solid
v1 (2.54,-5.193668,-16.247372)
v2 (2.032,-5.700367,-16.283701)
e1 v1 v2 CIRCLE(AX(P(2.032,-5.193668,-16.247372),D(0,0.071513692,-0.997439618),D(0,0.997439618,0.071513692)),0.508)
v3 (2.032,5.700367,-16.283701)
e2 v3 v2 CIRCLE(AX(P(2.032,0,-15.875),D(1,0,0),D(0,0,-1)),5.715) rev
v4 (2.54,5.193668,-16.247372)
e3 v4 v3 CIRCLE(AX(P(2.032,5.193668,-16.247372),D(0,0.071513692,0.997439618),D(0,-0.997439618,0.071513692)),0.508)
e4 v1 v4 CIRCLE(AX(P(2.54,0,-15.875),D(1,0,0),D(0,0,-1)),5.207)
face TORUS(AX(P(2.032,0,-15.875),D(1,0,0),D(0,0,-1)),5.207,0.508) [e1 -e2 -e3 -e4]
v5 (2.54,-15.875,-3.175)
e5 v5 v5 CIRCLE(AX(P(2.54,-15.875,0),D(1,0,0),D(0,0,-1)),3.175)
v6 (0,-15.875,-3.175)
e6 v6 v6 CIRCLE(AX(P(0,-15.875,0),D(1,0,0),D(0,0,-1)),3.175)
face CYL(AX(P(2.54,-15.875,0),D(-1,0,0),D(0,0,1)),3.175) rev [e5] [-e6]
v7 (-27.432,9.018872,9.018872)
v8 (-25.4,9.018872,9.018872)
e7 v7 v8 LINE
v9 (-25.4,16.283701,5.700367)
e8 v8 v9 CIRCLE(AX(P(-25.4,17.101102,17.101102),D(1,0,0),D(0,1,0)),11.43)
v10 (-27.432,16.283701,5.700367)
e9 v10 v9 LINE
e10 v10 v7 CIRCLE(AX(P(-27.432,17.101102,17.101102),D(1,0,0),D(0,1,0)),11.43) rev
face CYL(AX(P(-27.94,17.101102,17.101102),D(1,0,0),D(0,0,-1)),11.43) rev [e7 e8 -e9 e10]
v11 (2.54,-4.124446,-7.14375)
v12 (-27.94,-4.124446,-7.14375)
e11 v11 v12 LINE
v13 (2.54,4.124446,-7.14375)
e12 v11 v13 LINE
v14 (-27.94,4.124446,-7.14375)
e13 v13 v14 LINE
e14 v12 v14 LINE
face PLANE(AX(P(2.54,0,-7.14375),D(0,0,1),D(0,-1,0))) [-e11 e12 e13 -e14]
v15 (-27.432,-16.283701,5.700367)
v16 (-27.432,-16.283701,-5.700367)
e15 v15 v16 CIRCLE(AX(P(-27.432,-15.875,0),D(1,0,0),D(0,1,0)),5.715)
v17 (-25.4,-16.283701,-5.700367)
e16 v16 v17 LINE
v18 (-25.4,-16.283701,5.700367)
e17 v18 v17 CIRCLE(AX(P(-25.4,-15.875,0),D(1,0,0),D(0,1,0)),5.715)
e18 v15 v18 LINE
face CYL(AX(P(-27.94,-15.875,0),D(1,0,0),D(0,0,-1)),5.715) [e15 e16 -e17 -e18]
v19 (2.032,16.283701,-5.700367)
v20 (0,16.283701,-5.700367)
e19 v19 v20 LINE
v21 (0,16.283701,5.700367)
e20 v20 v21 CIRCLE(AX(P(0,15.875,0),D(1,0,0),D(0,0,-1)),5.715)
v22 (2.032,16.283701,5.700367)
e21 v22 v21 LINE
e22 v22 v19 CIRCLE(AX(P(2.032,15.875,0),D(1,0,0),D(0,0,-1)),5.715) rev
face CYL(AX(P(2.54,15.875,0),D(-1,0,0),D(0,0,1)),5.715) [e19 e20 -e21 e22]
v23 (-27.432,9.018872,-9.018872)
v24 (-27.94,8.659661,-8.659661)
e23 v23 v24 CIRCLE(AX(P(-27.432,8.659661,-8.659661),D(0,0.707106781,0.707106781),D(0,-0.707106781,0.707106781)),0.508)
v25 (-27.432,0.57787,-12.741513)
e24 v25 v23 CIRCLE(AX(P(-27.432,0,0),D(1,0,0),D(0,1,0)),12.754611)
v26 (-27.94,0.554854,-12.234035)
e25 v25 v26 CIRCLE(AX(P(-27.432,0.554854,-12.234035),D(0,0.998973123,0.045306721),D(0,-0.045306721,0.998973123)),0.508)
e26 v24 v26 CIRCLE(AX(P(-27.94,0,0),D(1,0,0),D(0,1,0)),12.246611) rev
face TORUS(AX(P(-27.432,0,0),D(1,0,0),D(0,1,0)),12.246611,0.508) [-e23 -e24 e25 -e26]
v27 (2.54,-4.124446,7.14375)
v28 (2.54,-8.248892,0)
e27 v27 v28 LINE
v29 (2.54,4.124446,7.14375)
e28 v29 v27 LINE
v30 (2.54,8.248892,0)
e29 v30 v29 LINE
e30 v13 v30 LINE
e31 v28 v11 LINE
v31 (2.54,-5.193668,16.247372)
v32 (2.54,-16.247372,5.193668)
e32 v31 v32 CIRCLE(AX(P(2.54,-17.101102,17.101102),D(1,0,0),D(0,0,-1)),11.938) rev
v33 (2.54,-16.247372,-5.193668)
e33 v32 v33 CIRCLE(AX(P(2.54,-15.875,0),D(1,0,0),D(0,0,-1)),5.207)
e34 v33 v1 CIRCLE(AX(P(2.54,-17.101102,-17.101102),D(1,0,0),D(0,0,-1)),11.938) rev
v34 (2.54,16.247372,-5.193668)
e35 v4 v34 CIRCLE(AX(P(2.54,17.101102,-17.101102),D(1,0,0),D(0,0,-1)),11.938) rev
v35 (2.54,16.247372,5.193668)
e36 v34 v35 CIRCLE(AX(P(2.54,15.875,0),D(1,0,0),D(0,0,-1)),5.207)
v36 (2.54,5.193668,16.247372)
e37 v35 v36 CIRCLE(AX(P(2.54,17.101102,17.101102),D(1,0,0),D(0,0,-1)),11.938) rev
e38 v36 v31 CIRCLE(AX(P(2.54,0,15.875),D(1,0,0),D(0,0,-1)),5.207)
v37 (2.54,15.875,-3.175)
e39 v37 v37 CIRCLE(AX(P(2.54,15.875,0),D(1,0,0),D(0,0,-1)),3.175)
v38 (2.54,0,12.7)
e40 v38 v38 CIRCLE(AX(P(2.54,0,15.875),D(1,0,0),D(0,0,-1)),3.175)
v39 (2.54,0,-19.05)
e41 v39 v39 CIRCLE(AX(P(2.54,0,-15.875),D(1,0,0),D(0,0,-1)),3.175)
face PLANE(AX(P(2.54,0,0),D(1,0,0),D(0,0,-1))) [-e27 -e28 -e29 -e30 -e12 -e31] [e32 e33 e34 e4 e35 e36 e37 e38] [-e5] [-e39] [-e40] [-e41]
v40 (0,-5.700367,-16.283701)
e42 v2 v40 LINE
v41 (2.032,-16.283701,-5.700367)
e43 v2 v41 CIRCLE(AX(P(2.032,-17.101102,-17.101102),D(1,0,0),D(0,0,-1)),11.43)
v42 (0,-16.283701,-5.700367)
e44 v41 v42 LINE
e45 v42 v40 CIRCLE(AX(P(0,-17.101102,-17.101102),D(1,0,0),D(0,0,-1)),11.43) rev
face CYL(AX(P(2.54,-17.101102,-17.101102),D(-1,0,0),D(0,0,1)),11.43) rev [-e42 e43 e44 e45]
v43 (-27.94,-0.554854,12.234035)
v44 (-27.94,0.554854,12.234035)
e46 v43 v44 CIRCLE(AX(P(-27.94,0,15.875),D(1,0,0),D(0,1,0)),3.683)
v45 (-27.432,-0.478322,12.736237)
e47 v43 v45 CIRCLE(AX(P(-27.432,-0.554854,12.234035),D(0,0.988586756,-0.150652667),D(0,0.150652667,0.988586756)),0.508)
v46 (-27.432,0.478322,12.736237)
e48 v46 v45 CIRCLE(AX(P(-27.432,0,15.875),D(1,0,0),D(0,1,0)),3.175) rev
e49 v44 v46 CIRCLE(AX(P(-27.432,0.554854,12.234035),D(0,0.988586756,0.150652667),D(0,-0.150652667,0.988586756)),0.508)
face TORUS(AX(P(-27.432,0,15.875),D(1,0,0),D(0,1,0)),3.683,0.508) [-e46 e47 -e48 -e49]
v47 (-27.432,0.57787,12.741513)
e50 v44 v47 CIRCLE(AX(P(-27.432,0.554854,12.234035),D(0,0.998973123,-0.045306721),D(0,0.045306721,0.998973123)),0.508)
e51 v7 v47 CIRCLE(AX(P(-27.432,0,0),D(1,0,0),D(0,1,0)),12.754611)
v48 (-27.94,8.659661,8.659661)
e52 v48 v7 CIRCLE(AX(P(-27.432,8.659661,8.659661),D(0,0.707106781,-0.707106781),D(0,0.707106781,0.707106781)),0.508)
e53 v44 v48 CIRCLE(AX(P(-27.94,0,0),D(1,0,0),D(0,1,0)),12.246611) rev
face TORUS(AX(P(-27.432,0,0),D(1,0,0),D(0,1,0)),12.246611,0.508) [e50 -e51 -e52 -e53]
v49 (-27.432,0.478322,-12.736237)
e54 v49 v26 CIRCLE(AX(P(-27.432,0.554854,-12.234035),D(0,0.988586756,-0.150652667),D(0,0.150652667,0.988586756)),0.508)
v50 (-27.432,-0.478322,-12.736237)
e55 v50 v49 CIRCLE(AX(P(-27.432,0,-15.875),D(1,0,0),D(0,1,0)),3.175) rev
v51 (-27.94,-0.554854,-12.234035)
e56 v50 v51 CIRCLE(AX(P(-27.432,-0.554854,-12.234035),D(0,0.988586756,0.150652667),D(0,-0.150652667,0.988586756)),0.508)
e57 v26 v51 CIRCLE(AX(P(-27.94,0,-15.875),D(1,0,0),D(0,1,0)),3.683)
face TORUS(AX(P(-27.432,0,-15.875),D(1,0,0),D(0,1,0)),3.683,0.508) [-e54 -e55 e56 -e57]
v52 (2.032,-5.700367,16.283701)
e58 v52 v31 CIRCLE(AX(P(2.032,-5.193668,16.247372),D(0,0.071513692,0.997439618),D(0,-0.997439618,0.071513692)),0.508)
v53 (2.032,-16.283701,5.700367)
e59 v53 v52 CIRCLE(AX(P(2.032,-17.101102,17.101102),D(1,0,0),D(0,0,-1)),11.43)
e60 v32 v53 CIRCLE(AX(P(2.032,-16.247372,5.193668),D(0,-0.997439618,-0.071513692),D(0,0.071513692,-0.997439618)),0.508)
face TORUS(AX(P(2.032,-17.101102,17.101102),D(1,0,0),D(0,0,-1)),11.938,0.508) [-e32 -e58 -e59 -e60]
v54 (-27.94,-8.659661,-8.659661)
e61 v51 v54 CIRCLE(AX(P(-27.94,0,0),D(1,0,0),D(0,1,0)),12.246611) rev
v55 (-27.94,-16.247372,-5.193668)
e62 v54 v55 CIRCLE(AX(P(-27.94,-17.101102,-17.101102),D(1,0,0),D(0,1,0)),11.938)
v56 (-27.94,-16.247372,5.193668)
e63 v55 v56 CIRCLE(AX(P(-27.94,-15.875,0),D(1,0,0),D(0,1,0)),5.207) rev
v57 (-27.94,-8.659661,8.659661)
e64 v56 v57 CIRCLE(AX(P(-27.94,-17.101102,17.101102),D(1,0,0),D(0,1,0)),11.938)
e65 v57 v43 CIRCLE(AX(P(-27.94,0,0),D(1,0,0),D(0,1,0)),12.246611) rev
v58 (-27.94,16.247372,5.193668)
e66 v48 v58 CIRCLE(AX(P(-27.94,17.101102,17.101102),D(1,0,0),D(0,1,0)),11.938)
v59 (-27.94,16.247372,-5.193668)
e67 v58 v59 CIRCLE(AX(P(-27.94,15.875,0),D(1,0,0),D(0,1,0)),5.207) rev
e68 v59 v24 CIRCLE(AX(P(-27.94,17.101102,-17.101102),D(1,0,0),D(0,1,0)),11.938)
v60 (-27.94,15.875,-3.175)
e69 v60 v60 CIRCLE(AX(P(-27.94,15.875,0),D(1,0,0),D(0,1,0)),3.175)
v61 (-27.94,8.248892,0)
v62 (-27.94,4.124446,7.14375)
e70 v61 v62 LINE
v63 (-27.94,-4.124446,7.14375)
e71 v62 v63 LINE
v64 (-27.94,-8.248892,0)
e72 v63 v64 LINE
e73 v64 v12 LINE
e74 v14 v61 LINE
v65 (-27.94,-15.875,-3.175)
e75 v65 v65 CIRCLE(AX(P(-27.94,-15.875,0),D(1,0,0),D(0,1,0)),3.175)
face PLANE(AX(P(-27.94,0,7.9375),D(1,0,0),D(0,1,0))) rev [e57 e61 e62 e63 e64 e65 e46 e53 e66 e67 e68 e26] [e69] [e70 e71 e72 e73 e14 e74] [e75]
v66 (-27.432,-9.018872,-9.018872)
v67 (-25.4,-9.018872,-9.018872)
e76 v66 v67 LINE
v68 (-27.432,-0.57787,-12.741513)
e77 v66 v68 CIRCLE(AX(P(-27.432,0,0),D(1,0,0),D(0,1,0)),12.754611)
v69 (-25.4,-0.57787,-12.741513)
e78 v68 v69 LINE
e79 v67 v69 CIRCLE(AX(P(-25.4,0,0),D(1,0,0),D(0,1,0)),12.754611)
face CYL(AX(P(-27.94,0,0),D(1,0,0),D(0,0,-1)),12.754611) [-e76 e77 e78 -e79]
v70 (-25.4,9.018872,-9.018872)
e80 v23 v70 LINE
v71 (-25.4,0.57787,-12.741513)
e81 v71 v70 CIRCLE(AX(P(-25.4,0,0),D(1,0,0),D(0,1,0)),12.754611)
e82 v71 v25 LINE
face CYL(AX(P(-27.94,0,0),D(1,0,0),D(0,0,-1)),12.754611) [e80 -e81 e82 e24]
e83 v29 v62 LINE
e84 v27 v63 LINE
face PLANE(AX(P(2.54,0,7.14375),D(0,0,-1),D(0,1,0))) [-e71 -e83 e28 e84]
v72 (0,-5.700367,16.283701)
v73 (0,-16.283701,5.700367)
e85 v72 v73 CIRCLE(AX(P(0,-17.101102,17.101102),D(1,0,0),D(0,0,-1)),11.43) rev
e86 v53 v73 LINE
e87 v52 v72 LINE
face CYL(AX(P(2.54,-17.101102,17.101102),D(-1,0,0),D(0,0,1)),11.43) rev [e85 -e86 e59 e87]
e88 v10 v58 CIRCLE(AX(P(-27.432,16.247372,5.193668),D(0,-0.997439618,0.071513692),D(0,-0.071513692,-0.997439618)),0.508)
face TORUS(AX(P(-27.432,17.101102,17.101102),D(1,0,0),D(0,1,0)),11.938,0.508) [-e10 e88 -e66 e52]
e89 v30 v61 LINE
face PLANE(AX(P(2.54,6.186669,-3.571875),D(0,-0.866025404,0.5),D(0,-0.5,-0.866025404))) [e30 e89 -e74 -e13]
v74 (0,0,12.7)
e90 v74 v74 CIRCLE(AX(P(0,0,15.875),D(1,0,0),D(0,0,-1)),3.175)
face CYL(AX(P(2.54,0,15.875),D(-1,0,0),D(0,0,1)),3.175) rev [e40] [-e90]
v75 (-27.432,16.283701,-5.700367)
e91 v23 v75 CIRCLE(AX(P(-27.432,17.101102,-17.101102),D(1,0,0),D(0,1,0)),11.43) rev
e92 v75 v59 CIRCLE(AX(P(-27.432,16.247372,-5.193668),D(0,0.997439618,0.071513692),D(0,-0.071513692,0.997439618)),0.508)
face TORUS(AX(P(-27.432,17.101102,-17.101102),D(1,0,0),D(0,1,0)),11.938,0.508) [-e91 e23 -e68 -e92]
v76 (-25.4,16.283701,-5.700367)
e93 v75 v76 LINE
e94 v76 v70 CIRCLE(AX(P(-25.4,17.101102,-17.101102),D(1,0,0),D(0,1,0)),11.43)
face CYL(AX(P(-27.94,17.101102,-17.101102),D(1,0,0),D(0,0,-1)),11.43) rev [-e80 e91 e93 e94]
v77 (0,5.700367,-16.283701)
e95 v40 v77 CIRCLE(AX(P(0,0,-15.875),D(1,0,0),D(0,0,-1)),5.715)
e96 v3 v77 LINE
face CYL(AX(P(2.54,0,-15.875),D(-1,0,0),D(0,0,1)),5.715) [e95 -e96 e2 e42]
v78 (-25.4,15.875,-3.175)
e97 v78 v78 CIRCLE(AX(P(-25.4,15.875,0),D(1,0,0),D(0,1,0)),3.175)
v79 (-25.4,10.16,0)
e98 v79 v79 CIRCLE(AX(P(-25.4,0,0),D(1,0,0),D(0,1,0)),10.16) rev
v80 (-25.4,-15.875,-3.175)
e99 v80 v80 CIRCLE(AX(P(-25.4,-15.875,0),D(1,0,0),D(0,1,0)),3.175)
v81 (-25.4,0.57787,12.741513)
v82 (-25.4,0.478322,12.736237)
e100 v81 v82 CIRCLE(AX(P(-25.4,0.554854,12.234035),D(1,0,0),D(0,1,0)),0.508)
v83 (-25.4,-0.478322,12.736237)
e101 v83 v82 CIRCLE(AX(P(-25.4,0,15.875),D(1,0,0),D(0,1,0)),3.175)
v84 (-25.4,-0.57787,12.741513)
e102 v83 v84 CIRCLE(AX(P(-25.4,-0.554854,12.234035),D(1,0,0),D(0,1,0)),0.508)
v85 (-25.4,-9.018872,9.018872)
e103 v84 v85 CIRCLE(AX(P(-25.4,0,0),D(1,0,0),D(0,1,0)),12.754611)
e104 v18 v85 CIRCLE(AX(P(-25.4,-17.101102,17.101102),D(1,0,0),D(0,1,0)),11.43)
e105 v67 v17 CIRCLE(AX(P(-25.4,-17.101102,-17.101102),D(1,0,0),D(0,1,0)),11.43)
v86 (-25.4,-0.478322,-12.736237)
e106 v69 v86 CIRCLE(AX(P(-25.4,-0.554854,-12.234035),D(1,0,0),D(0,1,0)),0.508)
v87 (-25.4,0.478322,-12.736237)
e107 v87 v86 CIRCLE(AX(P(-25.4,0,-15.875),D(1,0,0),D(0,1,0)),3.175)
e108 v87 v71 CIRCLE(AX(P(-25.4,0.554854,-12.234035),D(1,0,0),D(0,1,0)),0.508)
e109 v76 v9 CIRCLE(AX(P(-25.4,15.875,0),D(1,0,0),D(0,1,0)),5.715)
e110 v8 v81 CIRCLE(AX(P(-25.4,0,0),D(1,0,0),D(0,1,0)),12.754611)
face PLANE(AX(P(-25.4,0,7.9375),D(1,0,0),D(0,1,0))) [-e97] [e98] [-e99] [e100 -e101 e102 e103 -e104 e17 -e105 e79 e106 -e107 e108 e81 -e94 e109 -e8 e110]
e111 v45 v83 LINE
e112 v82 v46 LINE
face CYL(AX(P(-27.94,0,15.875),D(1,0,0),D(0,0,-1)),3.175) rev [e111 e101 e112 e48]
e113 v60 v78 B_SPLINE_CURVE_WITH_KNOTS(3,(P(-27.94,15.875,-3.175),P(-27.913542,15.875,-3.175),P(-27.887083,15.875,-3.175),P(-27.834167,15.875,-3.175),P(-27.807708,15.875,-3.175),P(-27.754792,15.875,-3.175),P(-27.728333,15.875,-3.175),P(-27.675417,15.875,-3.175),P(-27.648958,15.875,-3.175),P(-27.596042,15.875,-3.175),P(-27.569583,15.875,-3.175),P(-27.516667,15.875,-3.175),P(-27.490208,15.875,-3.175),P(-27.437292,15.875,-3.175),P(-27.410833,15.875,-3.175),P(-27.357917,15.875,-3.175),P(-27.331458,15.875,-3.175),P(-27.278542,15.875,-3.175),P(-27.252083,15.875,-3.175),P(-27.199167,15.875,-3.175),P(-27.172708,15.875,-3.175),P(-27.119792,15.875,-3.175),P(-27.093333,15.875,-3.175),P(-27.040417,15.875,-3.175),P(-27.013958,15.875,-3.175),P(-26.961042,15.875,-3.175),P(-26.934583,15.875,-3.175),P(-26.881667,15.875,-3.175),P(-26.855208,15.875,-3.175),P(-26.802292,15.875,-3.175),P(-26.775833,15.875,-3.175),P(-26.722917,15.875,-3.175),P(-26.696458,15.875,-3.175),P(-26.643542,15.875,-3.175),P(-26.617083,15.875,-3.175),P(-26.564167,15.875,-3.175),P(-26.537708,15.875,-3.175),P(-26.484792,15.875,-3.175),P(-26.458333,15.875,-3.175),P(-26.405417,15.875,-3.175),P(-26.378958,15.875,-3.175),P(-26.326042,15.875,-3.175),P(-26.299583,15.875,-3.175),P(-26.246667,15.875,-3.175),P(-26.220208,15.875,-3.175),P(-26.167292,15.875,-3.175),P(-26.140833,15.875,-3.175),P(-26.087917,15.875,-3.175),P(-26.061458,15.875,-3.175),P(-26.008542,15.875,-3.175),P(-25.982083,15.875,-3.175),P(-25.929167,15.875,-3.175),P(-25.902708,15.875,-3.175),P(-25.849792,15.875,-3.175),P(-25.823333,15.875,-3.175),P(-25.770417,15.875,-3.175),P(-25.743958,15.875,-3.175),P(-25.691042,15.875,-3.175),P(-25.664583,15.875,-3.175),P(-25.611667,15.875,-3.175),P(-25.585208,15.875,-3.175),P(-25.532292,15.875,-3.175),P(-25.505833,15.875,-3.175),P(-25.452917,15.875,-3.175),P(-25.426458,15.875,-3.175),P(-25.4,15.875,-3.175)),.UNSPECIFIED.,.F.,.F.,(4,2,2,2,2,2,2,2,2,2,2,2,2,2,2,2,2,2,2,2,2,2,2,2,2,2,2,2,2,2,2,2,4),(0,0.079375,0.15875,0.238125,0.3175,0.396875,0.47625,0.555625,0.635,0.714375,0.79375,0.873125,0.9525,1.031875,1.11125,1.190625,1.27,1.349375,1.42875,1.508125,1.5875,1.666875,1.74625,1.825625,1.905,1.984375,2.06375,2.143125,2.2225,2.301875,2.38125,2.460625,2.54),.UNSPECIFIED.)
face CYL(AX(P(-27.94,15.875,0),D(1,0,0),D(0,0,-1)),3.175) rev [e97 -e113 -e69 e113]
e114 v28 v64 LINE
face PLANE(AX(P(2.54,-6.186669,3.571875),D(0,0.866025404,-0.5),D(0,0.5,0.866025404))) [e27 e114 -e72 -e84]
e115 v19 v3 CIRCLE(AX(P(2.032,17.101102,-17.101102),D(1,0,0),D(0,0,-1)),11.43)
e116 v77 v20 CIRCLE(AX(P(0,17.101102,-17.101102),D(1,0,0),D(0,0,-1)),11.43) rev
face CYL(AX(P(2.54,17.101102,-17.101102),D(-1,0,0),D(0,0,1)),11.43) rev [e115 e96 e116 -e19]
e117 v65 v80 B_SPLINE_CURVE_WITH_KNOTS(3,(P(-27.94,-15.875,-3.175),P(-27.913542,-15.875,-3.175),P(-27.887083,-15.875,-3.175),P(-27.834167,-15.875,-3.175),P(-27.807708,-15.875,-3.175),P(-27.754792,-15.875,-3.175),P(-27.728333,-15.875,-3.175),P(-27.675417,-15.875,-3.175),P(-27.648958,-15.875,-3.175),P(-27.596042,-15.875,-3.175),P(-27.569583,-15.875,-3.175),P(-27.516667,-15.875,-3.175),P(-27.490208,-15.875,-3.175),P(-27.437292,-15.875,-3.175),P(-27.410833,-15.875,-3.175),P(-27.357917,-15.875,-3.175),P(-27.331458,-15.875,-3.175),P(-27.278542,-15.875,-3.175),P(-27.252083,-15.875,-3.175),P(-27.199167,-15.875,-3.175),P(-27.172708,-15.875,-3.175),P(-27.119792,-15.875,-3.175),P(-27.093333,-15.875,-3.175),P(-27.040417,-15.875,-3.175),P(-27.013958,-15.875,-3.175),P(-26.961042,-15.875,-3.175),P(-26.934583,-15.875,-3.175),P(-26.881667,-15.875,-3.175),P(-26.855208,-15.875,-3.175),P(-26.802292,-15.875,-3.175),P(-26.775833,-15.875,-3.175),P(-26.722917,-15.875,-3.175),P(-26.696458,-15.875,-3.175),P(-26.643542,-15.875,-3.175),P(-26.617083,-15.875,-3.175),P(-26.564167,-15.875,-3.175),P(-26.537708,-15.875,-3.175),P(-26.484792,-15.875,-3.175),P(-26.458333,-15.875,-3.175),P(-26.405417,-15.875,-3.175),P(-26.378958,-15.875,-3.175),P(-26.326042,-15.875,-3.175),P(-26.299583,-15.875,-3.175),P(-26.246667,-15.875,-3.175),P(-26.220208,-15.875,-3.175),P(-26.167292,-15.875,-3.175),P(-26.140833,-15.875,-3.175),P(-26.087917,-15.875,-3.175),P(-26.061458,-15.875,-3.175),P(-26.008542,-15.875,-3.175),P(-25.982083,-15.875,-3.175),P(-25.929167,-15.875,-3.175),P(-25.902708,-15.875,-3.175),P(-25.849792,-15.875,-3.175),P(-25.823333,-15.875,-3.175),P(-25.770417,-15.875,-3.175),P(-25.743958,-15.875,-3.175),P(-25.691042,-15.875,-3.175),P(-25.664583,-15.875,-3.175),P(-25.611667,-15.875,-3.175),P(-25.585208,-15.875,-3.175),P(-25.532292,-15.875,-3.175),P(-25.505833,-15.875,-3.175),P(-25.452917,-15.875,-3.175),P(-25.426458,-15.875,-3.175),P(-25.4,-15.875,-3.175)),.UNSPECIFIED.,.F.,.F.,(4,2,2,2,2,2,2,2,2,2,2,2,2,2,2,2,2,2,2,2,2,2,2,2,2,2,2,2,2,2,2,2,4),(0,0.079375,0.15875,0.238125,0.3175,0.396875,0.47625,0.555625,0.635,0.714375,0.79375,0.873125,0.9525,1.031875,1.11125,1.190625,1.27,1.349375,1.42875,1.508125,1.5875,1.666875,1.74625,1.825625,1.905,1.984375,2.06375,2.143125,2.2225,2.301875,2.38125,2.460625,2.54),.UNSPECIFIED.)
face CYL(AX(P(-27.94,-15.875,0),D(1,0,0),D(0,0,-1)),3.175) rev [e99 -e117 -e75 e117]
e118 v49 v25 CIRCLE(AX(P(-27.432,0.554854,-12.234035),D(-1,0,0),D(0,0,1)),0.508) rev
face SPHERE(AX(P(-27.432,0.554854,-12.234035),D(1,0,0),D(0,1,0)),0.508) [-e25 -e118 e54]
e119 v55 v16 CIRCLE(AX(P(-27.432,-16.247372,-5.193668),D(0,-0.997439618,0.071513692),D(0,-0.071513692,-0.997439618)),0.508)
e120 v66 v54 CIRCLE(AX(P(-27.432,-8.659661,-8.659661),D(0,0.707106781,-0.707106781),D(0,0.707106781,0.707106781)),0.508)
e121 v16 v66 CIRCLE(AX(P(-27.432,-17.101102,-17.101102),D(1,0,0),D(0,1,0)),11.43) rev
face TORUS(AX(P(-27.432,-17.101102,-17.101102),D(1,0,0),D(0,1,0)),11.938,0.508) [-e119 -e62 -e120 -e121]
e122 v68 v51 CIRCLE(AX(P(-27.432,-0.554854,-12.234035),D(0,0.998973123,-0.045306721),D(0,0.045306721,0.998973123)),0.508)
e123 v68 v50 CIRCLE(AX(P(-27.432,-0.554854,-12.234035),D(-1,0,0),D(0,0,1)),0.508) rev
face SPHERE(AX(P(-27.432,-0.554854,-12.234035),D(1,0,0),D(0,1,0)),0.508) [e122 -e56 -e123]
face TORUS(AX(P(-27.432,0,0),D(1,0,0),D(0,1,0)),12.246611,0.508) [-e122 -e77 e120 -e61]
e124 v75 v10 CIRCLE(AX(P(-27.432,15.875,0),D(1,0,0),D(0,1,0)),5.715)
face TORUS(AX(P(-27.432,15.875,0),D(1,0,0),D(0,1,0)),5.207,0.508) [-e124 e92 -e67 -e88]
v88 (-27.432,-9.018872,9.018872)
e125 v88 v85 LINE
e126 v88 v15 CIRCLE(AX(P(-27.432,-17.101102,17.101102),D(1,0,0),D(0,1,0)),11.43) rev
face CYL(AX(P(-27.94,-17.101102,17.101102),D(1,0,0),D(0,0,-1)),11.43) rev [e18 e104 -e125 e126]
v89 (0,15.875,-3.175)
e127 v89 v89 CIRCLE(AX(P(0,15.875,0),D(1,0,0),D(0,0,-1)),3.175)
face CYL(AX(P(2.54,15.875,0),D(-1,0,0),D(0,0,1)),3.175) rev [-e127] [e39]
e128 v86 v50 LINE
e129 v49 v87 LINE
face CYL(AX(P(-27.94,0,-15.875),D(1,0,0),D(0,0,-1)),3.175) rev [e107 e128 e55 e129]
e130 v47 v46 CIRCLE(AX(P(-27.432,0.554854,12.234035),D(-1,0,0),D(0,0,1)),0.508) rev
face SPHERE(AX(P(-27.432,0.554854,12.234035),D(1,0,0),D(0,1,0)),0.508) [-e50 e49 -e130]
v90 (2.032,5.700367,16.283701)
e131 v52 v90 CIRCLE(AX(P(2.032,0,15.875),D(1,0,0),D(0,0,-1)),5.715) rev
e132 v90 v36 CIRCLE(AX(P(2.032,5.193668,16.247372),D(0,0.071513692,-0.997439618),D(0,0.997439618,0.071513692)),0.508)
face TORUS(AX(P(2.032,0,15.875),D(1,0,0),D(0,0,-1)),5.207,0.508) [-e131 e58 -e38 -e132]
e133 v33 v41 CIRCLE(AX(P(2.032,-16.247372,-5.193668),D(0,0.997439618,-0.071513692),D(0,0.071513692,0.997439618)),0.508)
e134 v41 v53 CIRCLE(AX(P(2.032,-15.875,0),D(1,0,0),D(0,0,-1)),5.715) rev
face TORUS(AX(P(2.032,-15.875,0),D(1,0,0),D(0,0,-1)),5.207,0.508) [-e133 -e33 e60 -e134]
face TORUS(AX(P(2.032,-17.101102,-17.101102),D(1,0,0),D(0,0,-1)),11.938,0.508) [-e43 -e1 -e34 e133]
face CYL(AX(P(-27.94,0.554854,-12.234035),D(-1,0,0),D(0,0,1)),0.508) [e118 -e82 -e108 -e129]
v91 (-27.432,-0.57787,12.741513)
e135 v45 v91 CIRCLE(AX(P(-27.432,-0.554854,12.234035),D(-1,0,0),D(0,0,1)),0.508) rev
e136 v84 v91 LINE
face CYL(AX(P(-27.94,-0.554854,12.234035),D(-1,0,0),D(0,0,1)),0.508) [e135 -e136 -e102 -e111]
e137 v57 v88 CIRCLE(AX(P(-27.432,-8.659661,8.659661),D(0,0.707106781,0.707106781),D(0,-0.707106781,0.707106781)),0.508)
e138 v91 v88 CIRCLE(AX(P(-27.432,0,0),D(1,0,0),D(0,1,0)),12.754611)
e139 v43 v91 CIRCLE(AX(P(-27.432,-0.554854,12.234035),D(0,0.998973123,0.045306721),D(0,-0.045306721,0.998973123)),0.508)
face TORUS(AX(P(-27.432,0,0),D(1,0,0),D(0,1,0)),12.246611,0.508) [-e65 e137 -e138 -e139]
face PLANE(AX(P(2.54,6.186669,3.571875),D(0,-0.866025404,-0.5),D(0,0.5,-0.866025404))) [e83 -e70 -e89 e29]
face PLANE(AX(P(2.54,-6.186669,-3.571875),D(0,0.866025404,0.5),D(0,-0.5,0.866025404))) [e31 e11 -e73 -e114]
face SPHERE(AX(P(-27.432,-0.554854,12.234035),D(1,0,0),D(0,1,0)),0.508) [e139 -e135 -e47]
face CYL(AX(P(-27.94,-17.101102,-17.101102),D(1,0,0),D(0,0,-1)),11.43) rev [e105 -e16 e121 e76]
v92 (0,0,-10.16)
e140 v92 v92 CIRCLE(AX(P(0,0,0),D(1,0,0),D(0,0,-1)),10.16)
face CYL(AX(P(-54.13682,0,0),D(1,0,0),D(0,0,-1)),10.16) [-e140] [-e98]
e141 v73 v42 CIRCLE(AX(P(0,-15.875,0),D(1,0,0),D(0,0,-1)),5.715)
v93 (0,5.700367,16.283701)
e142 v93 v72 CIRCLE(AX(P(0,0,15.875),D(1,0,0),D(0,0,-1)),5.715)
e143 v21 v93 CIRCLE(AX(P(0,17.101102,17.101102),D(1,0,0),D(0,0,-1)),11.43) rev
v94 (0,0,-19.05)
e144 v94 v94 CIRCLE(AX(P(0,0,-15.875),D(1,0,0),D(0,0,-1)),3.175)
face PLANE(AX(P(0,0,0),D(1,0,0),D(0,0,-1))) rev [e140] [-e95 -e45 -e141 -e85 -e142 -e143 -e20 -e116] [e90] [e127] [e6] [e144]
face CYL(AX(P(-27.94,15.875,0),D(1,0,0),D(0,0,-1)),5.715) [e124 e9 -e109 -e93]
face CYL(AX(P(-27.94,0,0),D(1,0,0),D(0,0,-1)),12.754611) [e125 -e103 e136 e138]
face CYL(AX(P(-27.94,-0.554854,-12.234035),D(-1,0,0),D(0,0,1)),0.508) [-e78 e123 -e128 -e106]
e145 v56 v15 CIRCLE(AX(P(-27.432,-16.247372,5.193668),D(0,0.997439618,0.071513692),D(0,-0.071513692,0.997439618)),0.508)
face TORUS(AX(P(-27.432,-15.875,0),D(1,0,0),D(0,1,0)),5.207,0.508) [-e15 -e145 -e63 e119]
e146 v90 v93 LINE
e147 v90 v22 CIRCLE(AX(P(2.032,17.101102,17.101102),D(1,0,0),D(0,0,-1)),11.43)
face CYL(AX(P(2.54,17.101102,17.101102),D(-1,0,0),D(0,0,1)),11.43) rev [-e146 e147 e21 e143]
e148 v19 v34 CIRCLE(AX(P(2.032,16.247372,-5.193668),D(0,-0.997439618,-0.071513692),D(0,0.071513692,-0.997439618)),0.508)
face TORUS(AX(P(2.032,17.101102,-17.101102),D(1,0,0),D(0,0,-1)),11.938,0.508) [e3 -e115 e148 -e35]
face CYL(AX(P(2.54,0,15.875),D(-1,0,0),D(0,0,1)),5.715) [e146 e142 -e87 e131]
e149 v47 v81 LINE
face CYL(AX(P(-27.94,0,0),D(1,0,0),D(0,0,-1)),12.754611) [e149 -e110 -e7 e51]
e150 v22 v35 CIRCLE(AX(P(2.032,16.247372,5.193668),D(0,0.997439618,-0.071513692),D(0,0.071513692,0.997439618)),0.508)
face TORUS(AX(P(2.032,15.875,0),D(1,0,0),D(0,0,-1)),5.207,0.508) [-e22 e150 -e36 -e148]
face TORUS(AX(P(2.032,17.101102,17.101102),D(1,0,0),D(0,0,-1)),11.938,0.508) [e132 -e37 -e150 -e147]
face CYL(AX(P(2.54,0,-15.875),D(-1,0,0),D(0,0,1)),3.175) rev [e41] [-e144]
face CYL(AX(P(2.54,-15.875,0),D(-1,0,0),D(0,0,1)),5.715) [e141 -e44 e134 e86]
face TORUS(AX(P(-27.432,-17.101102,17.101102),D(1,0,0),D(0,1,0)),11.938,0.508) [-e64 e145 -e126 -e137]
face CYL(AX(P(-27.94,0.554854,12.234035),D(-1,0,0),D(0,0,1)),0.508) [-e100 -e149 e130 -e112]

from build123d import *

# Parameters (mm, degrees)
SKETCH1_R           = 10.16
BOSS_EXTRUDE4_DEPTH = 2.54
SKETCH1_7_R         = 10.16
BOSS_EXTRUDE5_DEPTH = 25.4
BOSS_EXTRUDE7_START = -27.94
SKETCH1_9_R         = 10.16
BOSS_EXTRUDE7_DEPTH = 2.54
FILLET1_R           = 0.508
FILLET2_R           = 0.508
FILLET3_R           = 0.508


with BuildPart() as part:
    # Sketch1 → Boss-Extrude4 (new body)
    # profile 1 of 4: a face of its own
    with BuildSketch(Plane(origin=(0, 0, 0), x_dir=(0, 0, -1), z_dir=(1, 0, 0))):
        with BuildLine():
            ThreePointArc((-12.743782522, 0.525454189), (-11.680659896, 5.122721879), (-9.018871744, 9.018871744))
            ThreePointArc((-9.018871744, 9.018871744), (-12.351999156, 6.704423948), (-16.283700751, 5.700367418))
            ThreePointArc((-16.283700751, 5.700367418), (-21.59, 0), (-16.283700751, -5.700367418))
            ThreePointArc((-16.283700751, -5.700367418), (-12.351999156, -6.704423948), (-9.018871744, -9.018871744))
            ThreePointArc((-9.018871744, -9.018871744), (-11.680659896, -5.122721879), (-12.743782522, -0.525454189))
            ThreePointArc((-12.743782522, -0.525454189), (-19.05, 0), (-12.743782522, 0.525454189))
        make_face()
    # profile 2 of 4: a face of its own
    with BuildSketch(Plane(origin=(0, 0, 0), x_dir=(0, 0, -1), z_dir=(1, 0, 0))):
        with BuildLine():
            ThreePointArc((12.743782522, -0.525454189), (12.7, 0), (12.743782522, 0.525454189))
            ThreePointArc((12.743782522, 0.525454189), (11.680659896, 5.122721879), (9.018871744, 9.018871744))
            ThreePointArc((9.018871744, 9.018871744), (6.704423948, 12.351999156), (5.700367418, 16.283700751))
            ThreePointArc((5.700367418, 16.283700751), (0, 21.59), (-5.700367418, 16.283700751))
            ThreePointArc((-5.700367418, 16.283700751), (-6.704423948, 12.351999156), (-9.018871744, 9.018871744))
            ThreePointArc((-9.018871744, 9.018871744), (-11.680659896, 5.122721879), (-12.743782522, 0.525454189))
            ThreePointArc((-12.743782522, 0.525454189), (-12.710964563, 0.263637542), (-12.7, 0))
            ThreePointArc((-12.7, 0), (-12.710964563, -0.263637542), (-12.743782522, -0.525454189))
            ThreePointArc((-12.743782522, -0.525454189), (-11.680659896, -5.122721879), (-9.018871744, -9.018871744))
            ThreePointArc((-9.018871744, -9.018871744), (-6.704423948, -12.351999156), (-5.700367418, -16.283700751))
            ThreePointArc((-5.700367418, -16.283700751), (0, -21.59), (5.700367418, -16.283700751))
            ThreePointArc((5.700367418, -16.283700751), (6.704423948, -12.351999156), (9.018871744, -9.018871744))
            ThreePointArc((9.018871744, -9.018871744), (11.680659896, -5.122721879), (12.743782522, -0.525454189))
        make_face()
        with BuildLine():
            ThreePointArc((0.525454189, -12.743782522), (2.423730807, -13.82410898), (3.175, -15.875))
            ThreePointArc((3.175, -15.875), (-2.05089102, -18.298730807), (-0.525454189, -12.743782522))
            ThreePointArc((-0.525454189, -12.743782522), (0, -12.7), (0.525454189, -12.743782522))
        make_face(mode=Mode.SUBTRACT)
        Circle(SKETCH1_R, mode=Mode.SUBTRACT)
        with BuildLine():
            ThreePointArc((-0.525454189, 12.743782522), (-2.05089102, 18.298730807), (3.175, 15.875))
            ThreePointArc((3.175, 15.875), (2.423730807, 13.82410898), (0.525454189, 12.743782522))
            ThreePointArc((0.525454189, 12.743782522), (0, 12.7), (-0.525454189, 12.743782522))
        make_face(mode=Mode.SUBTRACT)
    # profile 3 of 4: a face of its own
    with BuildSketch(Plane(origin=(0, 0, 0), x_dir=(0, 0, -1), z_dir=(1, 0, 0))):
        Circle(SKETCH1_R)
        Polygon((7.14375, -4.124445986), (7.14375, 4.124445986), (0, 8.248891971), (-7.14375, 4.124445986), (-7.14375, -4.124445986), (0, -8.248891971), align=None, mode=Mode.SUBTRACT)
    # profile 4 of 4: a face of its own
    with BuildSketch(Plane(origin=(0, 0, 0), x_dir=(0, 0, -1), z_dir=(1, 0, 0))):
        with BuildLine():
            ThreePointArc((12.743782522, 0.525454189), (16.138637542, 3.164035437), (19.05, 0))
            ThreePointArc((19.05, 0), (16.138637542, -3.164035437), (12.743782522, -0.525454189))
            ThreePointArc((12.743782522, -0.525454189), (11.680659896, -5.122721879), (9.018871744, -9.018871744))
            ThreePointArc((9.018871744, -9.018871744), (12.351999156, -6.704423948), (16.283700751, -5.700367418))
            ThreePointArc((16.283700751, -5.700367418), (21.59, 0), (16.283700751, 5.700367418))
            ThreePointArc((16.283700751, 5.700367418), (12.351999156, 6.704423948), (9.018871744, 9.018871744))
            ThreePointArc((9.018871744, 9.018871744), (11.680659896, 5.122721879), (12.743782522, 0.525454189))
        make_face()
    extrude(amount=BOSS_EXTRUDE4_DEPTH)

    # Sketch1<7> → Boss-Extrude5 (add)
    with BuildSketch(Plane(origin=(0, 0, 0), x_dir=(0, 0, -1), z_dir=(1, 0, 0))):
        Circle(SKETCH1_7_R)
        Polygon((7.14375, -4.124445986), (7.14375, 4.124445986), (0, 8.248891971), (-7.14375, 4.124445986), (-7.14375, -4.124445986), (0, -8.248891971), align=None, mode=Mode.SUBTRACT)
    extrude(amount=-BOSS_EXTRUDE5_DEPTH)

    # Sketch1<9> → Boss-Extrude7 (add)
    # profile 1 of 2: a face of its own
    with BuildSketch(Plane(origin=(0, 0, 0), x_dir=(0, 0, -1), z_dir=(1, 0, 0)).offset(BOSS_EXTRUDE7_START)):
        with BuildLine():
            ThreePointArc((12.743782522, -0.525454189), (12.7, 0), (12.743782522, 0.525454189))
            ThreePointArc((12.743782522, 0.525454189), (11.680659896, 5.122721879), (9.018871744, 9.018871744))
            ThreePointArc((9.018871744, 9.018871744), (6.704423948, 12.351999156), (5.700367418, 16.283700751))
            ThreePointArc((5.700367418, 16.283700751), (0, 21.59), (-5.700367418, 16.283700751))
            ThreePointArc((-5.700367418, 16.283700751), (-6.704423948, 12.351999156), (-9.018871744, 9.018871744))
            ThreePointArc((-9.018871744, 9.018871744), (-11.680659896, 5.122721879), (-12.743782522, 0.525454189))
            ThreePointArc((-12.743782522, 0.525454189), (-12.710964563, 0.263637542), (-12.7, 0))
            ThreePointArc((-12.7, 0), (-12.710964563, -0.263637542), (-12.743782522, -0.525454189))
            ThreePointArc((-12.743782522, -0.525454189), (-11.680659896, -5.122721879), (-9.018871744, -9.018871744))
            ThreePointArc((-9.018871744, -9.018871744), (-6.704423948, -12.351999156), (-5.700367418, -16.283700751))
            ThreePointArc((-5.700367418, -16.283700751), (0, -21.59), (5.700367418, -16.283700751))
            ThreePointArc((5.700367418, -16.283700751), (6.704423948, -12.351999156), (9.018871744, -9.018871744))
            ThreePointArc((9.018871744, -9.018871744), (11.680659896, -5.122721879), (12.743782522, -0.525454189))
        make_face()
        with BuildLine():
            ThreePointArc((0.525454189, -12.743782522), (2.423730807, -13.82410898), (3.175, -15.875))
            ThreePointArc((3.175, -15.875), (-2.05089102, -18.298730807), (-0.525454189, -12.743782522))
            ThreePointArc((-0.525454189, -12.743782522), (0, -12.7), (0.525454189, -12.743782522))
        make_face(mode=Mode.SUBTRACT)
        Circle(SKETCH1_9_R, mode=Mode.SUBTRACT)
        with BuildLine():
            ThreePointArc((-0.525454189, 12.743782522), (-2.05089102, 18.298730807), (3.175, 15.875))
            ThreePointArc((3.175, 15.875), (2.423730807, 13.82410898), (0.525454189, 12.743782522))
            ThreePointArc((0.525454189, 12.743782522), (0, 12.7), (-0.525454189, 12.743782522))
        make_face(mode=Mode.SUBTRACT)
    # profile 2 of 2: a face of its own
    with BuildSketch(Plane(origin=(0, 0, 0), x_dir=(0, 0, -1), z_dir=(1, 0, 0)).offset(BOSS_EXTRUDE7_START)):
        Circle(SKETCH1_9_R)
        Polygon((7.14375, -4.124445986), (7.14375, 4.124445986), (0, 8.248891971), (-7.14375, 4.124445986), (-7.14375, -4.124445986), (0, -8.248891971), align=None, mode=Mode.SUBTRACT)
    extrude(amount=BOSS_EXTRUDE7_DEPTH)

    # Fillet1
    fillet1_edges = [part.edges().sort_by_distance(p)[0] for p in [
        (2.54, 0, -21.59),
        (2.54, 9.018871744, -9.018871744),
        (2.54, 21.59, 0),
        (2.54, 9.018871744, 9.018871744),
        (2.54, 0, 21.59),
        (2.54, -9.018871744, 9.018871744),
        (2.54, -21.59, 0),
        (2.54, -9.018871744, -9.018871744),
    ]]
    fillet(fillet1_edges, radius=FILLET1_R)

    # Fillet2
    fillet2_edges = [part.edges().sort_by_distance(p)[0] for p in [
        (-26.67, -0.525454189, 12.743782522),
        (-26.67, 0.525454189, 12.743782522),
        (-26.67, 0.525454189, -12.743782522),
        (-26.67, -0.525454189, -12.743782522),
    ]]
    fillet(fillet2_edges, radius=FILLET2_R)

    # Fillet3
    fillet3_edges = [part.edges().sort_by_distance(p)[0] for p in [
        (-27.94, 0, 12.7),
        (-27.94, -5.146734512, 11.670099354),
        (-27.94, 5.146734512, -11.670099354),
        (-27.94, 0, -12.7),
        (-27.94, 0.527966167, -12.741322921),
        (-27.94, -0.527966167, -12.741322921),
        (-27.94, 0.527966167, 12.741322921),
        (-27.94, -0.527966167, 12.741322921),
        (-27.94, 5.146734512, 11.670099354),
        (-27.94, 21.59, 0),
        (-27.94, -5.146734512, -11.670099354),
        (-27.94, -21.59, 0),
        (-27.94, 12.351999156, 6.704423948),
        (-27.94, 12.351999156, -6.704423948),
        (-27.94, -12.351999156, -6.704423948),
        (-27.94, -12.351999156, 6.704423948),
    ]]
    fillet(fillet3_edges, radius=FILLET3_R - 0.0001)  # a hair under: the kernel refuses the full size


solid = part.part
